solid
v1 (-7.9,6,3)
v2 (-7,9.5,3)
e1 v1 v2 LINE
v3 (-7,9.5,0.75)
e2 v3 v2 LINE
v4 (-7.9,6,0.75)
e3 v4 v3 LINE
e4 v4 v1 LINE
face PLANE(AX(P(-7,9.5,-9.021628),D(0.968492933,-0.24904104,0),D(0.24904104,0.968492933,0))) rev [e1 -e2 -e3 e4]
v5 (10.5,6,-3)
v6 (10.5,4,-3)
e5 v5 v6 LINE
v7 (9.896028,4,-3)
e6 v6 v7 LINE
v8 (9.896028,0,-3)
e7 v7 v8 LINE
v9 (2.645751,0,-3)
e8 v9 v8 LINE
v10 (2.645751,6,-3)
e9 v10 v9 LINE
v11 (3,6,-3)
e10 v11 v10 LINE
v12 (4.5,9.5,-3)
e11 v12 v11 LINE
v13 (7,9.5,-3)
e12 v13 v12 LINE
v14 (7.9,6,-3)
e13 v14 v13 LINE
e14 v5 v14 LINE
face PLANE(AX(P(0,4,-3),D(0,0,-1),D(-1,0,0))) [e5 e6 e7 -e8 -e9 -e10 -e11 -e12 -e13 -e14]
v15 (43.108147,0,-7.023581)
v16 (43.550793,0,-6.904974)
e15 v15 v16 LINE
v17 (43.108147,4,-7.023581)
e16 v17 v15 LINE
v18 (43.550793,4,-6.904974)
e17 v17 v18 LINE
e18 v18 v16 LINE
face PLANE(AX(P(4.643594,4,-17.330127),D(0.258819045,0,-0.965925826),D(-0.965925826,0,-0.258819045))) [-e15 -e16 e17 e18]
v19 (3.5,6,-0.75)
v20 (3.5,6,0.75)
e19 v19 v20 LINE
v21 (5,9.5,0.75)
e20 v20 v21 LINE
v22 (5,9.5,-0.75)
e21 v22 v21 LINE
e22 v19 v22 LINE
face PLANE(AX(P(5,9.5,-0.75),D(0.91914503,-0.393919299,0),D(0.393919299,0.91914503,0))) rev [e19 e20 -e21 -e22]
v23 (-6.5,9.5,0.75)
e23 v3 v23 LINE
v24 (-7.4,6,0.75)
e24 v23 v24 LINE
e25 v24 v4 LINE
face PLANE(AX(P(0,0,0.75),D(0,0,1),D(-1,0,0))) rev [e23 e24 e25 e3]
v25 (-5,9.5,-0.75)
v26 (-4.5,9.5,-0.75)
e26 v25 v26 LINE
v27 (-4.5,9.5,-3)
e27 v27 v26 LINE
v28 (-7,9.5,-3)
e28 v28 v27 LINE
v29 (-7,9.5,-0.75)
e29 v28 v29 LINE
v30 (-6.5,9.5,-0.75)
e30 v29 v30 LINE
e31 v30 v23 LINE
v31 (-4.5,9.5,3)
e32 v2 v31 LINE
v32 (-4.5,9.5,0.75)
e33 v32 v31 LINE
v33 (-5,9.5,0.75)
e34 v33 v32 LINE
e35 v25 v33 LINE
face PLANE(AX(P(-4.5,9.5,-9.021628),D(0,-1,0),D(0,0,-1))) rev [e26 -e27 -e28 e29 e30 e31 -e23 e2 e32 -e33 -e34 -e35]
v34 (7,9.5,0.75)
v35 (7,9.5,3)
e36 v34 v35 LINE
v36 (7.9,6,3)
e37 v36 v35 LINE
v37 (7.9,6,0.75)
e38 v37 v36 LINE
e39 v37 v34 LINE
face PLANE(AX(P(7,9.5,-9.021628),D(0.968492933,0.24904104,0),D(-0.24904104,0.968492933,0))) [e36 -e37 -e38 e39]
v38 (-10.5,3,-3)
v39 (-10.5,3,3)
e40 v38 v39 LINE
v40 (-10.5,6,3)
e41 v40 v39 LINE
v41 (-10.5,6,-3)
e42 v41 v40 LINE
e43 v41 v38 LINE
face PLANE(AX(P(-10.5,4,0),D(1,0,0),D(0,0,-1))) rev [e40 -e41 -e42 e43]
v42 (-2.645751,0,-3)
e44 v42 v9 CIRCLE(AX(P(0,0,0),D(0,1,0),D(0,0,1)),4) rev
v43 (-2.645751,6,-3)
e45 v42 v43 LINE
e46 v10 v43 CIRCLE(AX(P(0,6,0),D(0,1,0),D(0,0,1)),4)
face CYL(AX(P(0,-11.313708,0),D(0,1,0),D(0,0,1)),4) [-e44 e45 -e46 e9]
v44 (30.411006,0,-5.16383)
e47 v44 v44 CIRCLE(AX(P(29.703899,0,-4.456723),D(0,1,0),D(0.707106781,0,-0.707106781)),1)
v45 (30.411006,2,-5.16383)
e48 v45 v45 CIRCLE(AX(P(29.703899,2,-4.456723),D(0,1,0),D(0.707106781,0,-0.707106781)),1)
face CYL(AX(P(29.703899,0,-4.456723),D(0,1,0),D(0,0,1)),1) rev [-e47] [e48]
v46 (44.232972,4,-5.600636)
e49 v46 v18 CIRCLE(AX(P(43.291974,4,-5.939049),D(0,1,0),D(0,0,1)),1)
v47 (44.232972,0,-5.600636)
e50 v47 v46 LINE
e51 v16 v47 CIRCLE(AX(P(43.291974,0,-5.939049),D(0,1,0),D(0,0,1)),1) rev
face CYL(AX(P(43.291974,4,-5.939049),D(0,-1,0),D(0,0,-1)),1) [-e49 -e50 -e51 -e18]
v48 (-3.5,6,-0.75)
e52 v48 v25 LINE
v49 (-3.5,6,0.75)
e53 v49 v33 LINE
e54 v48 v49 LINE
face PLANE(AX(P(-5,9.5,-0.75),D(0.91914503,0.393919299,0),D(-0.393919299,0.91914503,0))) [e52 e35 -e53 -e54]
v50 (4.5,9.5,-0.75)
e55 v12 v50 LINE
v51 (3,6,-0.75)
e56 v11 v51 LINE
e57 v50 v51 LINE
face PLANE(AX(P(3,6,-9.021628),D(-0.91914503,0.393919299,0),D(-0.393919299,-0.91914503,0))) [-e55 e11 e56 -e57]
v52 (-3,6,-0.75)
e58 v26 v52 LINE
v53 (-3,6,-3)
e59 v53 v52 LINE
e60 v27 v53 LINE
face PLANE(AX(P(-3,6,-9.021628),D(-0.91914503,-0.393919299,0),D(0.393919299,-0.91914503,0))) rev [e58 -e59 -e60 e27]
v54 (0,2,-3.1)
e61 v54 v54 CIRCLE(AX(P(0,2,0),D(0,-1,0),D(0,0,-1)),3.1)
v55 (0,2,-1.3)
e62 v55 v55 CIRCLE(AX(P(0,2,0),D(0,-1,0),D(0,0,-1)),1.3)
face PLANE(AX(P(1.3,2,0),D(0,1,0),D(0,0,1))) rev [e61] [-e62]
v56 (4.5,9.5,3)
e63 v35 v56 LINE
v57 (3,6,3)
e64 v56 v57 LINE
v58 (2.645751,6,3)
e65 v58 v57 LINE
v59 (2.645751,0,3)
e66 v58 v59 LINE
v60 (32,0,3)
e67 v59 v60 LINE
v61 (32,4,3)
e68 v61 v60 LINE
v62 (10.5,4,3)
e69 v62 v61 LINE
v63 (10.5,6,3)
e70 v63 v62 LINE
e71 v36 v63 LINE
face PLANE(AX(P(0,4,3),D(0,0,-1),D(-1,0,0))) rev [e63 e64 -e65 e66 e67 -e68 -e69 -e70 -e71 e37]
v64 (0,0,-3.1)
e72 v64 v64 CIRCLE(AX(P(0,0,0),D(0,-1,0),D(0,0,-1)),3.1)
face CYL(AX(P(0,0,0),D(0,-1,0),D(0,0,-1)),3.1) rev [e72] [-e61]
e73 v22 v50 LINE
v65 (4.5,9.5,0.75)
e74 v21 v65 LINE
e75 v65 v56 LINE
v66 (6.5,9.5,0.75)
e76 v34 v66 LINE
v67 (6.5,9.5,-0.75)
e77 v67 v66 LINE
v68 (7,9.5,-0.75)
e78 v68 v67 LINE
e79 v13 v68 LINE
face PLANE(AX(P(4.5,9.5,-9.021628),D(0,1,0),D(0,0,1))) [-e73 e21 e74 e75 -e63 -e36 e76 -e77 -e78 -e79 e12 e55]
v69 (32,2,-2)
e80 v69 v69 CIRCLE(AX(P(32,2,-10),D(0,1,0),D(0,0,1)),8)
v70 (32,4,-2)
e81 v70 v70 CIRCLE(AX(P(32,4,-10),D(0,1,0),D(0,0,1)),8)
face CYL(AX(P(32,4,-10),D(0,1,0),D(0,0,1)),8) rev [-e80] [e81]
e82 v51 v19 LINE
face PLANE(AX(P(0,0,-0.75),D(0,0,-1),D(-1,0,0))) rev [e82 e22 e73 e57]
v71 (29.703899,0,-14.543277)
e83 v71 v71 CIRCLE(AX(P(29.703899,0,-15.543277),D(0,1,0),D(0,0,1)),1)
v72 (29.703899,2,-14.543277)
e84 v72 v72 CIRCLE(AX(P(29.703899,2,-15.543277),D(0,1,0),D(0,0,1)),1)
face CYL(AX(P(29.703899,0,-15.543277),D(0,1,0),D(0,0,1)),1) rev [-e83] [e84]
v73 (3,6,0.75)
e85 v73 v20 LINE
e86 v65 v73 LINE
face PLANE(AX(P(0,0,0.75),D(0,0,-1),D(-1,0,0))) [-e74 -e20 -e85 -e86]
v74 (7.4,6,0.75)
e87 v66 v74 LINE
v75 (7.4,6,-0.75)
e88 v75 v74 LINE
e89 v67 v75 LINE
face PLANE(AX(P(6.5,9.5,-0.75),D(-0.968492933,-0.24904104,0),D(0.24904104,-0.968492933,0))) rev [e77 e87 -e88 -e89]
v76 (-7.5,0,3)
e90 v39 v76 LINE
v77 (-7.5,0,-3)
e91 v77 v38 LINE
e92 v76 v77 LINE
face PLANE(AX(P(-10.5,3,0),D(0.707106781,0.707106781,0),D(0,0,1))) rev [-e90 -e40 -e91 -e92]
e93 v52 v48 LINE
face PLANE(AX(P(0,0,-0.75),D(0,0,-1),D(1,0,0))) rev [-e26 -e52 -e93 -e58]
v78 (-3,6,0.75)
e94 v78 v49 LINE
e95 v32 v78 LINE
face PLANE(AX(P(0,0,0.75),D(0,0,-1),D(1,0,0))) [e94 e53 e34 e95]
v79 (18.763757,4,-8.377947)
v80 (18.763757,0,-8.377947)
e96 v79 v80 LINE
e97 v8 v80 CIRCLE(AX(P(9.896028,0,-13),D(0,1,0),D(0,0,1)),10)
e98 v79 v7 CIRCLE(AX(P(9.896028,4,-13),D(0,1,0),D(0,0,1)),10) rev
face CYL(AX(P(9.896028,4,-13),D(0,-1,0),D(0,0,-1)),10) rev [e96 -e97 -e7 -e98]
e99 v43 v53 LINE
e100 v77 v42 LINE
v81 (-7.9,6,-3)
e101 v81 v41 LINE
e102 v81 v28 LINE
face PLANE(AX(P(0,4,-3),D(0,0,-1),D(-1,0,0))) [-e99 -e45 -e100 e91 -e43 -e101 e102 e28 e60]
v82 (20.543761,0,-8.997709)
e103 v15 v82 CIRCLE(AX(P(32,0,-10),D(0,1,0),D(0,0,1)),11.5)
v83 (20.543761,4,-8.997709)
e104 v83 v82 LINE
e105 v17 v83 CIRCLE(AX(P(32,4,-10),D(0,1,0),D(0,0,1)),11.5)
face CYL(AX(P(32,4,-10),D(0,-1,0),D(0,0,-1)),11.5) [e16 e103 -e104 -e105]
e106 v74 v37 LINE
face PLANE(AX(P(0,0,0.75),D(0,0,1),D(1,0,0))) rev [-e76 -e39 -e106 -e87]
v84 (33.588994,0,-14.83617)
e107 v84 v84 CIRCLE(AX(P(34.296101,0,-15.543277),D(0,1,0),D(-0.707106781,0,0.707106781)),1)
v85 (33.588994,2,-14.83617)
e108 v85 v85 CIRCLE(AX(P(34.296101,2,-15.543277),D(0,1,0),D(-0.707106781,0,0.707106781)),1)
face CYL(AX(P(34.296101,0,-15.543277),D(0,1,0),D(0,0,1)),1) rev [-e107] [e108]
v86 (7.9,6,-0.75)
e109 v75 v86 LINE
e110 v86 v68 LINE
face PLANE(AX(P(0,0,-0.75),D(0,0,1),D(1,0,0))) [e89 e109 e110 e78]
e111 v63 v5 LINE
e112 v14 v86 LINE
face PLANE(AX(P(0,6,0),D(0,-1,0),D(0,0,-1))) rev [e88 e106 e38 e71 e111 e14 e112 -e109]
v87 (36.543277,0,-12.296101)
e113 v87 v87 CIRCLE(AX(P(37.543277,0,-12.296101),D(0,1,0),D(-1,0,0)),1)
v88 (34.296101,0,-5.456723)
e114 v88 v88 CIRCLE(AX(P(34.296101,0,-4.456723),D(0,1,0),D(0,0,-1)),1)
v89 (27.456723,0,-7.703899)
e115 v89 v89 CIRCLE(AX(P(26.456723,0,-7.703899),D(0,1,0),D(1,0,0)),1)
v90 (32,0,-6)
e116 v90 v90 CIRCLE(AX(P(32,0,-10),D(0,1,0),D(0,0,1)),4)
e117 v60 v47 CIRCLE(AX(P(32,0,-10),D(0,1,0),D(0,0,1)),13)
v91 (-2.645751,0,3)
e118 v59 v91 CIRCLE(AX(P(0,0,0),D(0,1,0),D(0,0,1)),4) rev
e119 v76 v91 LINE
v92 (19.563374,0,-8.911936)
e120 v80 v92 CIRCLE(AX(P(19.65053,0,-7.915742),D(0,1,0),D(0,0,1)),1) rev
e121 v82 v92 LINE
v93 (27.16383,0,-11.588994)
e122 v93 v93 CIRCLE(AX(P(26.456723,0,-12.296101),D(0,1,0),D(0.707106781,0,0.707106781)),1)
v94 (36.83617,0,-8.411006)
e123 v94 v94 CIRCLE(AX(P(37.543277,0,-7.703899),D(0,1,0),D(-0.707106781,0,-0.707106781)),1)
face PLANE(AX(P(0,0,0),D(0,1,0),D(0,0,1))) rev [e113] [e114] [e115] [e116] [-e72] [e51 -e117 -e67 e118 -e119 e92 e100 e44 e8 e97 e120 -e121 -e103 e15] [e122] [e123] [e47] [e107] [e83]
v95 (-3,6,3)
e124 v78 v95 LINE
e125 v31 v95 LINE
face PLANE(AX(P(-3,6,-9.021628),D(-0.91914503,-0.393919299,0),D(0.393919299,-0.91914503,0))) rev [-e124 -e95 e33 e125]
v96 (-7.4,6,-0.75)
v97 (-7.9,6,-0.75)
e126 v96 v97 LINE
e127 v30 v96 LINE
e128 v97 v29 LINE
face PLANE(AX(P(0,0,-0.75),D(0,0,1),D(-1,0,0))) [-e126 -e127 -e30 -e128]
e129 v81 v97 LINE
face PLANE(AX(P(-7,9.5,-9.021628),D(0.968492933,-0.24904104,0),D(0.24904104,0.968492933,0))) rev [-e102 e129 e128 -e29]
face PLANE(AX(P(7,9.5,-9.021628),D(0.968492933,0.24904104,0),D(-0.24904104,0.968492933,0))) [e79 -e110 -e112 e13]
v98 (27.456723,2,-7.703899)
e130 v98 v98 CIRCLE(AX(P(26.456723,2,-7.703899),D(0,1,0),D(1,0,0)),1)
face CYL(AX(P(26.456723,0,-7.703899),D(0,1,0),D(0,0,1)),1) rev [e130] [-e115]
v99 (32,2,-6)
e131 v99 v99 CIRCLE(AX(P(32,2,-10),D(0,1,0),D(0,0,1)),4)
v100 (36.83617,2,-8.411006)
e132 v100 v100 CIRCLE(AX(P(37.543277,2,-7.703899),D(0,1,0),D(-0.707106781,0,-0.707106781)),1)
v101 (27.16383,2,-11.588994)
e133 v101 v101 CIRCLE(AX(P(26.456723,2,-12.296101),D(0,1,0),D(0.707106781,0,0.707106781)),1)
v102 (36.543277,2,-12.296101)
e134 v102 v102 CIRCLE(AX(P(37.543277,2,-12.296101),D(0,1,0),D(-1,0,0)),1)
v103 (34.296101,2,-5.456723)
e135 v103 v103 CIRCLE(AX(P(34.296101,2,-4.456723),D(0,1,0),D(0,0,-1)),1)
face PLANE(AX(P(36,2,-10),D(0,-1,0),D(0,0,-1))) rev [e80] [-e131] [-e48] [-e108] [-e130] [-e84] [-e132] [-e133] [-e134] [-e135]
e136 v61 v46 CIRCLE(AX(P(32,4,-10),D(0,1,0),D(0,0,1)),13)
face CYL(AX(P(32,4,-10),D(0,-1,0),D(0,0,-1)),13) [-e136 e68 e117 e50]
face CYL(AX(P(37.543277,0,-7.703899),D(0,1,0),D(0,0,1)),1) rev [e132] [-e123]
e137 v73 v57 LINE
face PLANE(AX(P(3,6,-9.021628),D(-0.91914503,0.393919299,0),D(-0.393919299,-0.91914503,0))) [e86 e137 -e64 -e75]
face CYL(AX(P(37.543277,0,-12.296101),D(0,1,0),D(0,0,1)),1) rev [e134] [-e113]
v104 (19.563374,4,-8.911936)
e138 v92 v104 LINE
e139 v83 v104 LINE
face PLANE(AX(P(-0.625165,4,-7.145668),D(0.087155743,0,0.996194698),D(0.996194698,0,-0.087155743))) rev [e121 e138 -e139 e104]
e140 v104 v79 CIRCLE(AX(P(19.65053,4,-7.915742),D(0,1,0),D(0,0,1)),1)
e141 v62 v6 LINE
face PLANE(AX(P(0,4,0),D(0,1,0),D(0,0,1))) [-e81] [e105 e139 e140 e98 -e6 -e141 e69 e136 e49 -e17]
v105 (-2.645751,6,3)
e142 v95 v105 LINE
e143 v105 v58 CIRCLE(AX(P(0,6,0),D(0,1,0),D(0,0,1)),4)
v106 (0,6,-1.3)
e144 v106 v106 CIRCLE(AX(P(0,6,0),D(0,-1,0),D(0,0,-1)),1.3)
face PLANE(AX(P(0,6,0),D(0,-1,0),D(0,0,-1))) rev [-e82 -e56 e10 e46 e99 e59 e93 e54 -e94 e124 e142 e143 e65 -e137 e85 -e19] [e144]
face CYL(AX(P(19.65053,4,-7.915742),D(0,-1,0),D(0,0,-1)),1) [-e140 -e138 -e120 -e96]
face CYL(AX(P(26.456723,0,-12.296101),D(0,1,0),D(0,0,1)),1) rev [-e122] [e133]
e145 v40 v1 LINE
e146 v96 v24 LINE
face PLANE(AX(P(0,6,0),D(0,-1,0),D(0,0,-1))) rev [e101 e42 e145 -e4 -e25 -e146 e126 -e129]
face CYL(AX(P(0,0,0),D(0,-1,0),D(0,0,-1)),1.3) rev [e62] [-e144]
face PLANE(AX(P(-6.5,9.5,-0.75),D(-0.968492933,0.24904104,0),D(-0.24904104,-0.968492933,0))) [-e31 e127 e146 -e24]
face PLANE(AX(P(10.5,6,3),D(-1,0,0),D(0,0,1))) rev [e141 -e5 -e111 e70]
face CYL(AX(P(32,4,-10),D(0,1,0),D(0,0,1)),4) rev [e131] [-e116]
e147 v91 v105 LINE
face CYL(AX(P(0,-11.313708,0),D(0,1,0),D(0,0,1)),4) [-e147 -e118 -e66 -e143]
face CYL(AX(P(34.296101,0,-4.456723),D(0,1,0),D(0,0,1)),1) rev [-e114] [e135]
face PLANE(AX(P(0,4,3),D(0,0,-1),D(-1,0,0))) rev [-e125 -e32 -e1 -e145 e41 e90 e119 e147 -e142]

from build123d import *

# Parameters (mm, degrees)
EXTRUDE_1_DEPTH              = 4
FILLET_1_R                   = 10
FILLET_2_R                   = 1
SKETCH_2_W                   = 21
SKETCH_2_H                   = 6
EXTRUDE_2_DEPTH              = 2
SKETCH_3_R                   = 4
EXTRUDE_3_DEPTH              = 6
HOLE_WIZARD_M2_1_D           = 2.6
HOLE_WIZARD_M2_1_CBORE_D     = 6.2
HOLE_WIZARD_M2_1_CBORE_DEPTH = 2
CHAMFER_1_SIZE               = 3
EXTRUDE_4_DEPTH              = 6
CUT_EXTRUDE_2_DEPTH          = 0.75
HOLE_WIZARD_M2_2_D           = 8
HOLE_WIZARD_M2_2_CBORE_D     = 16
HOLE_WIZARD_M2_2_CBORE_DEPTH = 2
SKETCH_9_R                   = 1
CUT_EXTRUDE_1_DEPTH          = 2
PATTERN_CIRCULAR_1_COUNT     = 8


with BuildPart() as part:
    # ｽｹｯﾁ1 → ﾎﾞｽ - 押し出し1 (new body)
    with BuildSketch(Plane(origin=(0, 0, 0), x_dir=(1, 0, 0), z_dir=(0, 1, 0))):
        with BuildLine():
            Line((21.04554885, 3), (19, 3))
            Line((19, 3), (-10.5, 3))
            Line((-10.5, 3), (-10.5, -3))
            Line((-10.5, -3), (32, -3))
            ThreePointArc((32, -3), (25.755002002, -1.401754251), (21.04554885, 3))
        make_face()
        with BuildLine():
            Line((19.049468925, 8.866975344), (19, 8.862647374))
            Line((19, 8.862647374), (19, 3))
            Line((19, 3), (21.04554885, 3))
            ThreePointArc((21.04554885, 3), (19.692790986, 5.812804485), (19.049468925, 8.866975344))
        make_face()
        with BuildLine():
            Line((20.543760972, 8.997708958), (19.049468925, 8.866975344))
            ThreePointArc((19.049468925, 8.866975344), (19.692790986, 5.812804485), (21.04554885, 3))
            Line((21.04554885, 3), (22.875856205, 3))
            ThreePointArc((22.875856205, 3), (21.281736732, 5.832406867), (20.543760972, 8.997708958))
        make_face()
        with BuildLine():
            Line((32, 10), (20.543760972, 8.997708958))
            ThreePointArc((20.543760972, 8.997708958), (21.281736732, 5.832406867), (22.875856205, 3))
            Line((22.875856205, 3), (32, 3))
            Line((32, 3), (32, -1.5))
            ThreePointArc((32, -1.5), (39.000756434, 0.876436587), (43.108147002, 7.023580981))
            Line((43.108147002, 7.023580981), (32, 10))
        make_face()
        with BuildLine():
            ThreePointArc((43.5, 10), (31.498377045, 21.489054548), (20.543760972, 8.997708958))
            Line((20.543760972, 8.997708958), (32, 10))
            Line((32, 10), (43.108147002, 7.023580981))
            ThreePointArc((43.108147002, 7.023580981), (43.401615906, 8.498948789), (43.5, 10))
        make_face()
        with BuildLine():
            Line((32, 3), (22.875856205, 3))
            ThreePointArc((22.875856205, 3), (26.913252513, -0.313825672), (32, -1.5))
            Line((32, -1.5), (32, 3))
        make_face()
        with BuildLine():
            Line((22.875856205, 3), (21.04554885, 3))
            ThreePointArc((21.04554885, 3), (25.755002002, -1.401754251), (32, -3))
            Line((32, -3), (32, -1.5))
            ThreePointArc((32, -1.5), (26.913252513, -0.313825672), (22.875856205, 3))
        make_face()
        with BuildLine():
            ThreePointArc((32, -3), (39.913898577, -0.313593424), (44.557035742, 6.635352414))
            Line((44.557035742, 6.635352414), (43.108147002, 7.023580981))
            ThreePointArc((43.108147002, 7.023580981), (39.000756434, 0.876436587), (32, -1.5))
            Line((32, -1.5), (32, -3))
        make_face()
    extrude(amount=EXTRUDE_1_DEPTH)

    # ﾌｨﾚｯﾄ1
    # the kernel refuses this fillet: 10 mm, written as the material it adds along each edge
    with BuildSketch(Plane(origin=(19, 0, -3), x_dir=(-1, 0, 0), z_dir=(0, 1, 0))) as fillet_1_piece_1:
        with BuildLine():
            CenterArc((9.103972388, -10), FILLET_1_R, 90, 65.560304835)
            Line((0, -5.862647374), (-0.182079448, -5.779900322))
            ThreePointArc((-0.182079448, -5.779900322), (-0.2, -2.931323687), (-0.2, 0))
            Line((-0.2, 0), (0, 0.2))
            Line((0, 0.2), (9.103972388, 0.2))
            Line((9.103972388, 0.2), (9.103972388, 0))
        make_face()
    extrude(amount=4)

    # ﾌｨﾚｯﾄ2
    fillet_2_edges = [part.edges().sort_by_distance(p)[0] for p in [
        (44.557035742, 2, -6.635352414),
        (19, 2, -8.862647374),
    ]]
    fillet(fillet_2_edges, radius=FILLET_2_R)

    # ｽｹｯﾁ2 → ﾎﾞｽ - 押し出し2 (add)
    with BuildSketch(Plane(origin=(0, 4, 0), x_dir=(1, 0, 0), z_dir=(0, 1, 0))):
        Rectangle(SKETCH_2_W, SKETCH_2_H)
    extrude(amount=EXTRUDE_2_DEPTH)

    # ｽｹｯﾁ3 → ﾎﾞｽ - 押し出し3 (add)
    with BuildSketch(Plane(origin=(0, 6, 0), x_dir=(1, 0, 0), z_dir=(0, 1, 0))):
        Circle(SKETCH_3_R)
    extrude(amount=-EXTRUDE_3_DEPTH)

    # M2 丸平ねじ用座ぐり穴1 (through all)
    with Locations(Plane(origin=(0, 0, 0), x_dir=(-1, 0, 0), z_dir=(0, -1, 0))):
        with Locations((0, 0)):
            CounterBoreHole(HOLE_WIZARD_M2_1_D / 2, HOLE_WIZARD_M2_1_CBORE_D / 2, HOLE_WIZARD_M2_1_CBORE_DEPTH)

    # 面取り1
    chamfer_1_edges = [part.edges().sort_by_distance(p)[0] for p in [
        (-10.5, 0, 0),
    ]]
    chamfer(chamfer_1_edges, length=CHAMFER_1_SIZE)

    # ｽｹｯﾁ6 → ﾎﾞｽ - 押し出し4 (add)
    with BuildSketch(Plane.XY.offset(3)):
        Polygon((3, 6), (4.5, 9.5), (7, 9.5), (7.9, 6), align=None)
    extrude_4 = extrude(amount=-EXTRUDE_4_DEPTH)

    # ｽｹｯﾁ10 → ｶｯﾄ - 押し出し2 (cut, symmetric)
    with BuildSketch(Plane.XY):
        Polygon((5, 9.5), (4.5, 9.5), (3, 6), (3.5, 6), align=None)
        Polygon((6.5, 9.5), (7, 9.5), (7.9, 6), (7.4, 6), align=None)
    cut_extrude_2 = extrude(amount=CUT_EXTRUDE_2_DEPTH, both=True, mode=Mode.SUBTRACT)

    # ﾐﾗｰ1: ﾎﾞｽ - 押し出し4, ｶｯﾄ - 押し出し2 across plane
    add(extrude_4.mirror(Plane(origin=(0, 0, 0), x_dir=(0, 0, 1), z_dir=(1, 0, 0))))
    add(cut_extrude_2.mirror(Plane(origin=(0, 0, 0), x_dir=(0, 0, 1), z_dir=(1, 0, 0))), mode=Mode.SUBTRACT)

    # M2 丸平ねじ用座ぐり穴2 (through all)
    with Locations(Plane(origin=(0, 4, 0), x_dir=(1, 0, 0), z_dir=(0, 1, 0))):
        with Locations((32, 10)):
            CounterBoreHole(HOLE_WIZARD_M2_2_D / 2, HOLE_WIZARD_M2_2_CBORE_D / 2, HOLE_WIZARD_M2_2_CBORE_DEPTH)

    # ｽｹｯﾁ9 → ｶｯﾄ - 押し出し1 (cut)
    with BuildSketch(Plane(origin=(0, 2, 0), x_dir=(1, 0, 0), z_dir=(0, 1, 0))):
        with Locations(Location((29.703899406, 15.543277195, 0), (0, 0, 270))):
            Circle(SKETCH_9_R)
    cut_extrude_1 = extrude(amount=-CUT_EXTRUDE_1_DEPTH, mode=Mode.SUBTRACT)

    # 円形ﾊﾟﾀｰﾝ1: ｶｯﾄ - 押し出し1 ×8 about axis
    pattern_circular_1_axis = Axis((32, 0, -10), (0, 1, 0))
    for i in range(1, PATTERN_CIRCULAR_1_COUNT):
        add(cut_extrude_1.rotate(pattern_circular_1_axis, i * 360 / PATTERN_CIRCULAR_1_COUNT), mode=Mode.SUBTRACT)


solid = part.part
